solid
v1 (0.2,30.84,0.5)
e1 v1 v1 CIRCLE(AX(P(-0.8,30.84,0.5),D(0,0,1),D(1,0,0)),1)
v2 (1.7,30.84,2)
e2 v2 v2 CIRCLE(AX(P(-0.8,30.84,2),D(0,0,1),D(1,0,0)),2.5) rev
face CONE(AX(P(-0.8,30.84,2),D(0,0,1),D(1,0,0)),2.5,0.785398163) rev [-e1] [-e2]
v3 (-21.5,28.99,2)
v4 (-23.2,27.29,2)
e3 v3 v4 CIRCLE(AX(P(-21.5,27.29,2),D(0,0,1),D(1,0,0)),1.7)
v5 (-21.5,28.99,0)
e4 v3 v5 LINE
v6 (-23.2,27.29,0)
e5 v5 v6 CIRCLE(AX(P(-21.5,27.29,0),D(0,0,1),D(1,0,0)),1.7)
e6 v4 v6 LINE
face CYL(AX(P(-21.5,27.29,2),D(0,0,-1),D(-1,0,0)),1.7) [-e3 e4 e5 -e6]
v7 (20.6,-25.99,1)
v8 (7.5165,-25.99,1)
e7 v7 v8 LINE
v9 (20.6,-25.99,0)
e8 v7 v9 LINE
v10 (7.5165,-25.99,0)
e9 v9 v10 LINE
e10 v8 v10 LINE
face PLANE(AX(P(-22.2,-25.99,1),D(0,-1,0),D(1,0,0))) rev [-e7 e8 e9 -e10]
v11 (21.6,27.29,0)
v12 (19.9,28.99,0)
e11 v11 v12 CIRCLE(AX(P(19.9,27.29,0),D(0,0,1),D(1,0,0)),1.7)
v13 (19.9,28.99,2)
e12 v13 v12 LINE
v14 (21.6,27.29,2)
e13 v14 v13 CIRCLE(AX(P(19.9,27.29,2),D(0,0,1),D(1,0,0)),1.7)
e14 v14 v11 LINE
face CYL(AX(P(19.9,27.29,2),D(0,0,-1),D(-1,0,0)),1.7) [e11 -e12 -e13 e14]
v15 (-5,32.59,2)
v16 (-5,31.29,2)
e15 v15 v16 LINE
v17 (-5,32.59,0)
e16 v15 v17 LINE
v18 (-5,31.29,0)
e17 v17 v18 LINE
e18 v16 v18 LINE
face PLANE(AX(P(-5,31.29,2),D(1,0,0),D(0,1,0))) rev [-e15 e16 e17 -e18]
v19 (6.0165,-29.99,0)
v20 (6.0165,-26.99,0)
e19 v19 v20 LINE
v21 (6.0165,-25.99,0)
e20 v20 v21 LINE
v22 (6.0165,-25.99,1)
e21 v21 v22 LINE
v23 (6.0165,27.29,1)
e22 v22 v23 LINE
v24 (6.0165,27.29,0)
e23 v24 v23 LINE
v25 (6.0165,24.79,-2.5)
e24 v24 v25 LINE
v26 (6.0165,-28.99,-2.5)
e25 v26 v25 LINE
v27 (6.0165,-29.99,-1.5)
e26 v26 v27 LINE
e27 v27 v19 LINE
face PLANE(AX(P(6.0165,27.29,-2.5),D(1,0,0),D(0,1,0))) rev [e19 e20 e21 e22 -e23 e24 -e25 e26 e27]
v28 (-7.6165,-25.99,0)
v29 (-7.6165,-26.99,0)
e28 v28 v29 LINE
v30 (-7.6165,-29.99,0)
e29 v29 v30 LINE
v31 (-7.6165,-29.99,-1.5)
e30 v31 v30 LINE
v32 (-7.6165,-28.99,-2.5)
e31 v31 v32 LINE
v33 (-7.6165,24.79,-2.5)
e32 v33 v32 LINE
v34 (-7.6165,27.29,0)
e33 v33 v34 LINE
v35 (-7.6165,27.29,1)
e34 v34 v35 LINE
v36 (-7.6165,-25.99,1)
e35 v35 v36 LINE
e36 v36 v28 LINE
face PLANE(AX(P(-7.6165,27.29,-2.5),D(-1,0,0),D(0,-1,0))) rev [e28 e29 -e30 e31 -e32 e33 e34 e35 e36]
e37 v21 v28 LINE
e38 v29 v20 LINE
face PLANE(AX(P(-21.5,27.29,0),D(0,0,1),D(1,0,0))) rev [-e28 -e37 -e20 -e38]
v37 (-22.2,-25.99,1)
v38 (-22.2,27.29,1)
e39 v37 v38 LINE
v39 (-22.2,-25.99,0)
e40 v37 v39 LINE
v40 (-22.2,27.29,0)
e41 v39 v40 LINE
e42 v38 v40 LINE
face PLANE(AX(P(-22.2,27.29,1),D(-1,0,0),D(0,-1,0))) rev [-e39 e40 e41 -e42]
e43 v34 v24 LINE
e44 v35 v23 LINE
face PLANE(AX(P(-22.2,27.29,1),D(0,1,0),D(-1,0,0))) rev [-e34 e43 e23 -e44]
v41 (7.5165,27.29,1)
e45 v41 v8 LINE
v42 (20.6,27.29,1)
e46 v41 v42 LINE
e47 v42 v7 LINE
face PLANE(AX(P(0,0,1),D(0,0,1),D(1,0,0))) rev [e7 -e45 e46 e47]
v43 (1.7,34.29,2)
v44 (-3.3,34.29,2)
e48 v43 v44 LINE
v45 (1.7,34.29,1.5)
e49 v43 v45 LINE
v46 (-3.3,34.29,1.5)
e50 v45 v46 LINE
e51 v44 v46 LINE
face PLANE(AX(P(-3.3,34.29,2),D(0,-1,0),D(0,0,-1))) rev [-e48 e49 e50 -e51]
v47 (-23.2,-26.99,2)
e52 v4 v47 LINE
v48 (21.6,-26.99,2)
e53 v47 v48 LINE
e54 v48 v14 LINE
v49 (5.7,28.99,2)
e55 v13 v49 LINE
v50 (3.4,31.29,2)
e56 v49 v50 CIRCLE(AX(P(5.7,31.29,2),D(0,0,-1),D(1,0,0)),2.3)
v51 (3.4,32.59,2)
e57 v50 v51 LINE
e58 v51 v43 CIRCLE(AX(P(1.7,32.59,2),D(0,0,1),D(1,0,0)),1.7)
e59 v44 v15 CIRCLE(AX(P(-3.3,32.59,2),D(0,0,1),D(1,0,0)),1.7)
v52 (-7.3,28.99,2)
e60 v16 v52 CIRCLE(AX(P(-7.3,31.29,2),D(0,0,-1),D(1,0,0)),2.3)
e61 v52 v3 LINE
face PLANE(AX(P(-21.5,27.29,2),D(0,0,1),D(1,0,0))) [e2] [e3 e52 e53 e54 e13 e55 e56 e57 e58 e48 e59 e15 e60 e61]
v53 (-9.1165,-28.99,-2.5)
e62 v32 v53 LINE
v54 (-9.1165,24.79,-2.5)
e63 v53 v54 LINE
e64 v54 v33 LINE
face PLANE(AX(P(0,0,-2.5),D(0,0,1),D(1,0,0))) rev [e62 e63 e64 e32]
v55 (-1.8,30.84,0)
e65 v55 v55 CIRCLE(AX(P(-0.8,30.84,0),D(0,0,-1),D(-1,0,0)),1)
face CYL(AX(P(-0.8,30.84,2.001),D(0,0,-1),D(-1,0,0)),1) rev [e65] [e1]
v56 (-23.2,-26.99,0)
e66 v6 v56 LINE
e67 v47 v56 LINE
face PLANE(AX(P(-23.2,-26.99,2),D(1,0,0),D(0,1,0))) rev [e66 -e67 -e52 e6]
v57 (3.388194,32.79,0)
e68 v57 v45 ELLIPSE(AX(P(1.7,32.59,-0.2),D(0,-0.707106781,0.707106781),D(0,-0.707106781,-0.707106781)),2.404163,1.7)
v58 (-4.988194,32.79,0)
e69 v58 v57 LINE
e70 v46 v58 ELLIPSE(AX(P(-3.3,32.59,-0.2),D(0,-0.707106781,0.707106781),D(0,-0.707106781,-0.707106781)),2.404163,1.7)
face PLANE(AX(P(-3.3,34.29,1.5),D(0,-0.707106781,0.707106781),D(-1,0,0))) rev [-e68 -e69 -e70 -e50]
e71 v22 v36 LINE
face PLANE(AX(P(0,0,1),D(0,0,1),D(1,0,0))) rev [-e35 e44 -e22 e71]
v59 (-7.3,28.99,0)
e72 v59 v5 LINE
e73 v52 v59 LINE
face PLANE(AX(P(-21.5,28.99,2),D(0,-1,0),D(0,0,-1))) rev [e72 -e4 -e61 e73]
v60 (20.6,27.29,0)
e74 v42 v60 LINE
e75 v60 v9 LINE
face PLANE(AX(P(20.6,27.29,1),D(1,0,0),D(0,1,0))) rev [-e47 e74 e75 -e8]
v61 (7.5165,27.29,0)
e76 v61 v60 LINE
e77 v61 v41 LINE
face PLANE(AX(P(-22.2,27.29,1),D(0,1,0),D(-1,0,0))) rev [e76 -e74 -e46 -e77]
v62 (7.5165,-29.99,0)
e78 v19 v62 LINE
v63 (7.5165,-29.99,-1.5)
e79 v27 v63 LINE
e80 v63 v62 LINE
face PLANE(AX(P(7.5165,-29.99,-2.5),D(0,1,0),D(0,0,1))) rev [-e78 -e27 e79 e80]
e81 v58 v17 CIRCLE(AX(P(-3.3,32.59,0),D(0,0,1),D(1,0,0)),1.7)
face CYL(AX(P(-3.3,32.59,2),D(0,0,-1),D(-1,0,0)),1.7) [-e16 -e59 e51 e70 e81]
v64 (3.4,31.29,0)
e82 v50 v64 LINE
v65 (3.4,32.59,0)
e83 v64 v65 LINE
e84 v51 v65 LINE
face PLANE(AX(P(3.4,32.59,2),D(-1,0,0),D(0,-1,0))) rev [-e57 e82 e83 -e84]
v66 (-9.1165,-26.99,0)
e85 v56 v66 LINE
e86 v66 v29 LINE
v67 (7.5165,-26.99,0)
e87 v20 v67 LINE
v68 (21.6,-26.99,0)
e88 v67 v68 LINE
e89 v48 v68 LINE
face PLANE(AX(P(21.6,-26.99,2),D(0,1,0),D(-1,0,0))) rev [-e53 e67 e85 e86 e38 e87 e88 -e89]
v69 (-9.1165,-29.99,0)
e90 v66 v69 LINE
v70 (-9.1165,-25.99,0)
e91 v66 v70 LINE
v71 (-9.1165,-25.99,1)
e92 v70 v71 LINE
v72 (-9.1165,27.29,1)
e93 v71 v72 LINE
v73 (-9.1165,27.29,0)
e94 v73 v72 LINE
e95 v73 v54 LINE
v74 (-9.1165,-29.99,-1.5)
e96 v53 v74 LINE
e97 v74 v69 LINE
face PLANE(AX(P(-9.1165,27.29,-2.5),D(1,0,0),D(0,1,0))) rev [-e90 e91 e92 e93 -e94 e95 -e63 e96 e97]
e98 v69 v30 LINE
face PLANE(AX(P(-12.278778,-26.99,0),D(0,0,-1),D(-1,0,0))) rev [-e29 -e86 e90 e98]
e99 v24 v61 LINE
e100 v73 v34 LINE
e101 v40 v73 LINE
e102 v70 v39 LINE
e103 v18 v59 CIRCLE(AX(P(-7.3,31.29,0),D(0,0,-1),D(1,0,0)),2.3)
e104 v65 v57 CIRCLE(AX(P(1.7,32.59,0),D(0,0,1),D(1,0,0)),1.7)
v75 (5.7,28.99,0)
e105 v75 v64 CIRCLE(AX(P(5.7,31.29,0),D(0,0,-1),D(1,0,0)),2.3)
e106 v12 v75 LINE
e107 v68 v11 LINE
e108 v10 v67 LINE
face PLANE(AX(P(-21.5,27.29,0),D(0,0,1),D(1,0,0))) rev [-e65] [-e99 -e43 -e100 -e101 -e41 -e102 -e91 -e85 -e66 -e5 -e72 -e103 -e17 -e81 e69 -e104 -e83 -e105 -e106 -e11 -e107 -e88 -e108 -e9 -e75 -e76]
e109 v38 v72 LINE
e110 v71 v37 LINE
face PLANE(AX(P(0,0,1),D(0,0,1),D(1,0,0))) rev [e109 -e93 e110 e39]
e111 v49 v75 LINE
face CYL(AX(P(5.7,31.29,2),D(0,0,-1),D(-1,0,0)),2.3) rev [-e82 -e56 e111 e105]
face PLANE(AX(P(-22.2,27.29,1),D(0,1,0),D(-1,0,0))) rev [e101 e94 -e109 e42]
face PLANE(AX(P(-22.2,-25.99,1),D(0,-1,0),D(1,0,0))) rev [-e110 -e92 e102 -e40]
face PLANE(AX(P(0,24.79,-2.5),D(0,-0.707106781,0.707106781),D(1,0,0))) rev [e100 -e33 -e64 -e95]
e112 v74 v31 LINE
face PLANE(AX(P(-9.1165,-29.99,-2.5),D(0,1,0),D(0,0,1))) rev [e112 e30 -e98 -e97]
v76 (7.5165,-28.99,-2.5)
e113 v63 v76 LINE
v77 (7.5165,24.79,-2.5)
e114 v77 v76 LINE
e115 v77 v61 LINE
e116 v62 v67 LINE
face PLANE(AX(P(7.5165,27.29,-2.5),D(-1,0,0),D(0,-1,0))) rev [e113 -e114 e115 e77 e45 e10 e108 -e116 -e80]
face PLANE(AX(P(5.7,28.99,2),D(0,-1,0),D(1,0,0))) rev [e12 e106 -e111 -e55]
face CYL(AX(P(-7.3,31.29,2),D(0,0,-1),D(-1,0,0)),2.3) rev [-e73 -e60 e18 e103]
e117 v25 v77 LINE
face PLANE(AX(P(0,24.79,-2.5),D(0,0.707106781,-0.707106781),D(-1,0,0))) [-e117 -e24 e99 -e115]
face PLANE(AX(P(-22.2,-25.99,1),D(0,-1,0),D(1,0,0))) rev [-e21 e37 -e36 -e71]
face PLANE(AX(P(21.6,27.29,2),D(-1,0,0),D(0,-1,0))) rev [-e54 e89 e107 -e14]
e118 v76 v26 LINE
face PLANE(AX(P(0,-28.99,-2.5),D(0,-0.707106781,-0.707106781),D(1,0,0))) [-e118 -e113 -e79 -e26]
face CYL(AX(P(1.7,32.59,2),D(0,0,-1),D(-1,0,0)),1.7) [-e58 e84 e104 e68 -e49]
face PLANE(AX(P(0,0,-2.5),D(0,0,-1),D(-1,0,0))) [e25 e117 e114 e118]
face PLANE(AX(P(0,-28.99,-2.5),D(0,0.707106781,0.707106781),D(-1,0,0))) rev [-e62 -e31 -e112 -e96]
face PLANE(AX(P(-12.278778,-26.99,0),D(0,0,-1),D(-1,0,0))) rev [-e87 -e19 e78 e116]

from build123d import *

# Parameters (mm, degrees)
BOSS_EXTRUDE1_DEPTH = 2
CUT_EXTRUDE1_REACH  = 43.449
SKETCH2_R           = 1
SKETCH3_W           = 42.8
SKETCH3_H           = 53.28
CUT_EXTRUDE2_DEPTH  = 1
SKETCH4_W           = 1.5
SKETCH4_H           = 57.28
BOSS_EXTRUDE2_DEPTH = 3.5
SKETCH5_W           = 1
SKETCH5_H           = 3
CUT_EXTRUDE3_DEPTH  = 16.633
CHAMFER1_SIZE       = 1
CHAMFER2_SIZE       = 2.5
CHAMFER3_SIZE       = 1.5
CHAMFER4_SIZE       = 1.5


# Some blends are built 0.0001 mm under size
with BuildPart() as part:
    # Sketch1 → Boss-Extrude1 (new body)
    with BuildSketch(Plane.XY):
        with BuildLine():
            Line((-23.2, -26.99), (-23.2, 27.29))
            ThreePointArc((-23.2, 27.29), (-22.702081528, 28.492081528), (-21.5, 28.99))
            Line((-21.5, 28.99), (-7.3, 28.99))
            ThreePointArc((-7.3, 28.99), (-5.673654403, 29.663654403), (-5, 31.29))
            Line((-5, 31.29), (-5, 32.59))
            ThreePointArc((-5, 32.59), (-4.502081528, 33.792081528), (-3.3, 34.29))
            Line((-3.3, 34.29), (1.7, 34.29))
            ThreePointArc((1.7, 34.29), (2.902081528, 33.792081528), (3.4, 32.59))
            Line((3.4, 32.59), (3.4, 31.29))
            ThreePointArc((3.4, 31.29), (4.073654403, 29.663654403), (5.7, 28.99))
            Line((5.7, 28.99), (19.9, 28.99))
            ThreePointArc((19.9, 28.99), (21.102081528, 28.492081528), (21.6, 27.29))
            Line((21.6, 27.29), (21.6, -26.99))
            Line((21.6, -26.99), (-23.2, -26.99))
        make_face()
    extrude(amount=BOSS_EXTRUDE1_DEPTH)

    # Sketch2 → Cut-Extrude1 (cut, up to next)
    with BuildSketch(Plane(origin=(0, 0, 0), x_dir=(-1, 0, 0), z_dir=(0, 0, -1)), mode=Mode.PRIVATE) as cut_extrude1_sk1:
        with Locations((0.8, 30.84)):
            Circle(SKETCH2_R)
    cut_extrude1_tool1 = extrude(cut_extrude1_sk1.sketch, amount=-CUT_EXTRUDE1_REACH, mode=Mode.PRIVATE) & part.part
    add(cut_extrude1_tool1.solids().sort_by_distance((-0.8, 30.84, 0))[0], mode=Mode.SUBTRACT)

    # Sketch3 → Cut-Extrude2 (cut)
    with BuildSketch(Plane(origin=(0, 0, 0), x_dir=(-1, 0, 0), z_dir=(0, 0, -1))):
        with Locations((0.8, 0.65)):
            Rectangle(SKETCH3_W, SKETCH3_H)
    extrude(amount=-CUT_EXTRUDE2_DEPTH, mode=Mode.SUBTRACT)

    # Sketch4 → Boss-Extrude2 (add)
    with BuildSketch(Plane(origin=(0, 0, 1), x_dir=(-1, 0, 0), z_dir=(0, 0, -1))):
        with Locations((-6.7665, -1.35)):
            Rectangle(SKETCH4_W, SKETCH4_H)
        with Locations((8.3665, -1.35)):
            Rectangle(SKETCH4_W, SKETCH4_H)
    extrude(amount=BOSS_EXTRUDE2_DEPTH)

    # Sketch5 → Cut-Extrude3 (cut)
    with BuildSketch(Plane(origin=(7.5165, 0, 0), x_dir=(0, 0, -1), z_dir=(1, 0, 0))):
        with Locations((-0.5, -28.49)):
            Rectangle(SKETCH5_W, SKETCH5_H)
    extrude(amount=-CUT_EXTRUDE3_DEPTH, mode=Mode.SUBTRACT)

    # Chamfer1
    chamfer1_edges = [part.edges().sort_by_distance(p)[0] for p in [
        (6.7665, -29.99, -2.5),
        (-8.3665, -29.99, -2.5),
    ]]
    chamfer(chamfer1_edges, length=CHAMFER1_SIZE)

    # Chamfer2
    chamfer2_edges = [part.edges().sort_by_distance(p)[0] for p in [
        (6.7665, 27.29, -2.5),
        (-8.3665, 27.29, -2.5),
    ]]
    chamfer(chamfer2_edges, length=CHAMFER2_SIZE - 0.0001)  # a hair under: the kernel refuses the full size

    # Chamfer3
    # the kernel refuses this chamfer: 1.5 mm, written as the material it takes off along each edge
    with BuildSketch(Plane(origin=(-7.157524482, 34.29, 0), x_dir=(0, -0.9996219169112968, -0.02749587661058636), z_dir=(1, 0, 0))) as chamfer3_piece_1:
        Polygon((CHAMFER3_SIZE * 0.999621916911, -CHAMFER3_SIZE * 0.0274958766106), (-CHAMFER3_SIZE * 0.0274958766106, -CHAMFER3_SIZE * 0.999621916911), (0, 0), align=None)
    extrude(amount=12.715048964, mode=Mode.SUBTRACT)

    # Chamfer4
    chamfer4_edges = [part.edges().sort_by_distance(p)[0] for p in [
        (0.2, 30.84, 2),
    ]]
    chamfer(chamfer4_edges, length=CHAMFER4_SIZE)


solid = part.part
